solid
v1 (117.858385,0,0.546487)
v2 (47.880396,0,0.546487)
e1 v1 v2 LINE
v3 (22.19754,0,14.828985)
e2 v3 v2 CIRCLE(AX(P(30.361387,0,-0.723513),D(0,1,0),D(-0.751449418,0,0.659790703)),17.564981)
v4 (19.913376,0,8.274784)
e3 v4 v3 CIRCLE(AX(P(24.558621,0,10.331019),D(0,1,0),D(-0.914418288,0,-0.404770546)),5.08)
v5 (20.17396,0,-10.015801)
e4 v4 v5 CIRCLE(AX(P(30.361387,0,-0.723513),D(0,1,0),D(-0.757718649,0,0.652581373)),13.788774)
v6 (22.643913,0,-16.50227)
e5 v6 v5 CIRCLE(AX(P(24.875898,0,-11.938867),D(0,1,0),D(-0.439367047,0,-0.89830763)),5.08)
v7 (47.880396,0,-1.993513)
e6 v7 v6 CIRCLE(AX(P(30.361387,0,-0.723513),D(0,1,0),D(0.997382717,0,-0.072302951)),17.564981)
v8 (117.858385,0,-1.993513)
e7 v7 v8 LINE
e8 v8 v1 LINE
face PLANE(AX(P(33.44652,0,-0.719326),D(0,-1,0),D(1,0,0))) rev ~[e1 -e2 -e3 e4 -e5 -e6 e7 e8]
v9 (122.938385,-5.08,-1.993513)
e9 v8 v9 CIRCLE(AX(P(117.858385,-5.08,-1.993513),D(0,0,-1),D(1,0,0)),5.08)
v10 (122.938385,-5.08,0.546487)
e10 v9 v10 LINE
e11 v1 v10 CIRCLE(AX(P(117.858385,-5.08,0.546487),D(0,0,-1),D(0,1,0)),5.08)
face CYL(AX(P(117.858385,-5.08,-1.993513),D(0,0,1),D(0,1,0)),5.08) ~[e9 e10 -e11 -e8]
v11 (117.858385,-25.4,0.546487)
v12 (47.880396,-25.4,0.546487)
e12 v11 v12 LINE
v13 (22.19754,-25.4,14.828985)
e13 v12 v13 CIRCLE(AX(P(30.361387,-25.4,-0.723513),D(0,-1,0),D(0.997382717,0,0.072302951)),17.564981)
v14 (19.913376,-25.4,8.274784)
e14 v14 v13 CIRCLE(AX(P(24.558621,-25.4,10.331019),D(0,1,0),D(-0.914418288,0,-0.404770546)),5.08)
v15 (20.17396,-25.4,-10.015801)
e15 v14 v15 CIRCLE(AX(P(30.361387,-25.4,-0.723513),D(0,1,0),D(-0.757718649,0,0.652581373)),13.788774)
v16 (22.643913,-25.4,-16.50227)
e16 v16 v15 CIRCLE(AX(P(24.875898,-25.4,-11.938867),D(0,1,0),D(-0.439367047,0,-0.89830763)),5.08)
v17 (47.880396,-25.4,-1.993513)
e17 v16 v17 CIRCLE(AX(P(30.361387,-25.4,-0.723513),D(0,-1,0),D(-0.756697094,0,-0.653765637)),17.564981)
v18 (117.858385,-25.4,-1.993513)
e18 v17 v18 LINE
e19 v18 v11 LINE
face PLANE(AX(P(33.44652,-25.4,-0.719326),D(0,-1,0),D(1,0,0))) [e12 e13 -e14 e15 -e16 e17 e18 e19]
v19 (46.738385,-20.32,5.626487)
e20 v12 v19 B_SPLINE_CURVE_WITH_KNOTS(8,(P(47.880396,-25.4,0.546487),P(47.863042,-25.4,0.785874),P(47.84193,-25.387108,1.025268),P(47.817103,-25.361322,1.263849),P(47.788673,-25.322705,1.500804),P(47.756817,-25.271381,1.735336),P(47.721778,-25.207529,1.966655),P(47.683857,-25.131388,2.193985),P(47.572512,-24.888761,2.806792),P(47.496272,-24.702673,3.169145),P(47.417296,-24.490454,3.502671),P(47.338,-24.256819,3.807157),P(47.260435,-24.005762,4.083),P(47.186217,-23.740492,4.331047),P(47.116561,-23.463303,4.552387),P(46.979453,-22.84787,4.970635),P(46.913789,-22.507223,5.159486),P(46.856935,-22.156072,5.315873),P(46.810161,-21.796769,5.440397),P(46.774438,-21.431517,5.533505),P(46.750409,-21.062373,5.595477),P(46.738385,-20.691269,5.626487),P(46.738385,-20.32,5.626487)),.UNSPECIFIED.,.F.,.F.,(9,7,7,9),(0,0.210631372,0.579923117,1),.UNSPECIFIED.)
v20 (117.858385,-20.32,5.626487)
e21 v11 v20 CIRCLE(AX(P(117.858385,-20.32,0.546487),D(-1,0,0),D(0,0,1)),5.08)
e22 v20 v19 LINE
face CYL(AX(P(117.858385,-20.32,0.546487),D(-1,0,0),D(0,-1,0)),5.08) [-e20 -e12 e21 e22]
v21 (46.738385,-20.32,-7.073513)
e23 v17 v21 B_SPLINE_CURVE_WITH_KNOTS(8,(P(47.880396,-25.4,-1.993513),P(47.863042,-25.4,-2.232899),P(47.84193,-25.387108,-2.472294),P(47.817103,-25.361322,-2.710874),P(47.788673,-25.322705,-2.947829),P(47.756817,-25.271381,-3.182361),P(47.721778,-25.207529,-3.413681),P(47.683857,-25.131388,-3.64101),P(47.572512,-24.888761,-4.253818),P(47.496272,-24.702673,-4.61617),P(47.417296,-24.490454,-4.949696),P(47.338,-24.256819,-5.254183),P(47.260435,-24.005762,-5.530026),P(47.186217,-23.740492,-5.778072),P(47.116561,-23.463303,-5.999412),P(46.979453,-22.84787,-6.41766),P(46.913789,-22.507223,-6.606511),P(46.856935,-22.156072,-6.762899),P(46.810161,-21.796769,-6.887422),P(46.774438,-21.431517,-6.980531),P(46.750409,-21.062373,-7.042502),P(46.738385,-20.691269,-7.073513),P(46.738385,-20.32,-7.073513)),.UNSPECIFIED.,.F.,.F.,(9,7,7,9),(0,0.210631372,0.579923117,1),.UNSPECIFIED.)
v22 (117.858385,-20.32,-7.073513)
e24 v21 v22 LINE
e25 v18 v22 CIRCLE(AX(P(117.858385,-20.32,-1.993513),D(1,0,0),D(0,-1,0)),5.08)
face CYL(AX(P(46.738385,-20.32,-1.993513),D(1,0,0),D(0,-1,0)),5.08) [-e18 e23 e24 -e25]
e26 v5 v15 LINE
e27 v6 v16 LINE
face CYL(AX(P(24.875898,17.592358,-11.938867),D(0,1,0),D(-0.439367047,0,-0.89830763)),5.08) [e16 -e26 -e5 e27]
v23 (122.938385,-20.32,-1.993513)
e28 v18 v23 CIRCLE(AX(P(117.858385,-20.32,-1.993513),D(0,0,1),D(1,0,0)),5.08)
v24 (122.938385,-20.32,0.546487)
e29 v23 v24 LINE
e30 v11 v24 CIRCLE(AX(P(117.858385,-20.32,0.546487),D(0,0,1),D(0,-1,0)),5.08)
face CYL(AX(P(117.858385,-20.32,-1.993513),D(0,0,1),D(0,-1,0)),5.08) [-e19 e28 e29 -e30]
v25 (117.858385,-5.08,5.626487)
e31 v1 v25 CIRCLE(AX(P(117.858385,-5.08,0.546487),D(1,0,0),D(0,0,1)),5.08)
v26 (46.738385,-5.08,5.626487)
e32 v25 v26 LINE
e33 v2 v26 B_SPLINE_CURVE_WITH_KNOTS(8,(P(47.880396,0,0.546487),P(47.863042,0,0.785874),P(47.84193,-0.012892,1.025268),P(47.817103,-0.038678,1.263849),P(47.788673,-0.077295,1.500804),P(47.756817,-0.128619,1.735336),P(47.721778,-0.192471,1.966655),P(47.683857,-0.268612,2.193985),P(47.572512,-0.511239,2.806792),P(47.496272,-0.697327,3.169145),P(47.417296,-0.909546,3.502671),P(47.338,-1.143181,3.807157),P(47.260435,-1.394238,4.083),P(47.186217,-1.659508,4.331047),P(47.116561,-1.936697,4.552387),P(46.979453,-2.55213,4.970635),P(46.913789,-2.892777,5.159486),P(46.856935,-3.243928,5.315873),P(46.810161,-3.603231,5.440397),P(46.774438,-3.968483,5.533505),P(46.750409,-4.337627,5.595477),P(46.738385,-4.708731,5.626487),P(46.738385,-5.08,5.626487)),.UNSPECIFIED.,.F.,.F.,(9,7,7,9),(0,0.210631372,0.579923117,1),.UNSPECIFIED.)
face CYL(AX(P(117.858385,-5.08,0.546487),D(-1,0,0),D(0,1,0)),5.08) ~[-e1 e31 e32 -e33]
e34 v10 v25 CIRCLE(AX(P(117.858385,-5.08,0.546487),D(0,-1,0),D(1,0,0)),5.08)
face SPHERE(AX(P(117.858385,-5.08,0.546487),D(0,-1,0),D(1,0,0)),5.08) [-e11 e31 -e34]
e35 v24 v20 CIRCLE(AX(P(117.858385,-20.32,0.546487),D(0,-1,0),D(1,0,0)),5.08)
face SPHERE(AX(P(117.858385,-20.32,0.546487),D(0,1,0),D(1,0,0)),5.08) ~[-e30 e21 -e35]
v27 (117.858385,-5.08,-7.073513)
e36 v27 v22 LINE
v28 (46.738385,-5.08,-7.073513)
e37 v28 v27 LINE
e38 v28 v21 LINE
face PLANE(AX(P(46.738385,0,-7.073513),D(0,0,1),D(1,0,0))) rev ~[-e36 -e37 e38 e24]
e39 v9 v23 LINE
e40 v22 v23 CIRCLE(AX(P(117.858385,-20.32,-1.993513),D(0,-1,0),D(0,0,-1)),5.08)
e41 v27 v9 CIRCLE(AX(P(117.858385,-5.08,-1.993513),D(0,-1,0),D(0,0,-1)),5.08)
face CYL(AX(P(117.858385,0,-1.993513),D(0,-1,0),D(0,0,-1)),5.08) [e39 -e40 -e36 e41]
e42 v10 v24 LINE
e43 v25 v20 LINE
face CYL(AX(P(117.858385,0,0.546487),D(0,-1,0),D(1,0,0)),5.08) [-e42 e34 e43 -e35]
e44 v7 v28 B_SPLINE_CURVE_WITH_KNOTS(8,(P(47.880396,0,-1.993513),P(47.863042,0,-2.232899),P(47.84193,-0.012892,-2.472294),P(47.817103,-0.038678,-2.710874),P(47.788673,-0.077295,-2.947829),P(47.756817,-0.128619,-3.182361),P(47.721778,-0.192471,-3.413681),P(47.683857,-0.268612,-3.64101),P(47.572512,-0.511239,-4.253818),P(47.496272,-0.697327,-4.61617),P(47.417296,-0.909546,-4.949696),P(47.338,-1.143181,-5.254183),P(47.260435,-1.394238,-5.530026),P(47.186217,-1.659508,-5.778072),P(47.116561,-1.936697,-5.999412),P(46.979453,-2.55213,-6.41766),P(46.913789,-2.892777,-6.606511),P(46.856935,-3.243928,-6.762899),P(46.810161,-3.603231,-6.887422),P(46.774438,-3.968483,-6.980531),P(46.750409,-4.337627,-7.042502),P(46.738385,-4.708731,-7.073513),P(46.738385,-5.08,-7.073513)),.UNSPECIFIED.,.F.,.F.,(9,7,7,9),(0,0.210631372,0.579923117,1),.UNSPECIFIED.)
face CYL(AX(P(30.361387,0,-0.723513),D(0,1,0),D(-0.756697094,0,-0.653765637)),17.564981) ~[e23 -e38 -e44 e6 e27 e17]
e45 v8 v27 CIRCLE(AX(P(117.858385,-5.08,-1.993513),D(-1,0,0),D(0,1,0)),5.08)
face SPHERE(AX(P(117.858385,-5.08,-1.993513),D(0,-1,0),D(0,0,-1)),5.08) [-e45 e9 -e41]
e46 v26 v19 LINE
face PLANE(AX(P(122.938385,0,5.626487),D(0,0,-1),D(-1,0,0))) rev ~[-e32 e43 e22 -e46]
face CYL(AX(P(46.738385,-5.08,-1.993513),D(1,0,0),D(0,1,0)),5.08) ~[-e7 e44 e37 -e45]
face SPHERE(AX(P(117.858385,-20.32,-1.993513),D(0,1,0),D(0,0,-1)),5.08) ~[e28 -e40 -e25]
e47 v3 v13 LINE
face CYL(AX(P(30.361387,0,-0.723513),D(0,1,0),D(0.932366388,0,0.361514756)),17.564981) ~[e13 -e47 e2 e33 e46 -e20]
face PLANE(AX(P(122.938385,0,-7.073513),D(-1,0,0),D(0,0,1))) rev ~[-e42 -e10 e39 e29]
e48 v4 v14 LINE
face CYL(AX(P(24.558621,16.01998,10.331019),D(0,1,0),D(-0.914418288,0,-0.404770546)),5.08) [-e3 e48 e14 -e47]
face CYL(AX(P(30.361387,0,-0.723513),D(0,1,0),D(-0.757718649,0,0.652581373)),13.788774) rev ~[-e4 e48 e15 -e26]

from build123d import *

# Parameters (mm, degrees)
F1_DEPTH    = 25.4
F2_F1_R     = 5.08
F2_F2_R     = 5.08
F2_F3_R     = 5.08
F2_F4_R     = 5.08
F5_T1_DEPTH = 57.4399599705
F5_T3_DEPTH = 60.5847169717


# Not quite as in the source:
# - a fillet or chamfer that OpenCascade refuses, or shapes differently, is made with other operations: its cross-section is extruded or revolved along the edge and cut away or added
# - a feature of the source that left no trace in its solid (it failed there, or was rolled back) is left out


with BuildPart() as f1:
    # F0 (on Front) → F1 (new body)
    with BuildSketch(Plane.XZ):
        with BuildLine():
            ThreePointArc((19.913375901, 8.2747844221), (44.1487619553, -0.5270852778), (20.1739600729, -10.0158007924))
            Line((20.1739600729, -10.0158007924), (17.0700166839, -12.2068939621))
            ThreePointArc((17.0700166839, -12.2068939621), (33.3560783856, -18.0313258742), (46.7383854464, -7.0735126536))
            Line((46.7383854464, -7.0735126536), (46.7383854464, 5.6264873464))
            ThreePointArc((46.7383854464, 5.6264873464), (33.4251988827, 16.5721987148), (17.1621920022, 10.8656988202))
            Line((17.1621920022, 10.8656988202), (19.913375901, 8.2747844221))
        make_face()
        with BuildLine():
            Line((46.7383854464, 5.6264873464), (46.7383854464, -7.0735126536))
            ThreePointArc((46.7383854464, -7.0735126536), (47.9263685939, -0.7235126536), (46.7383854464, 5.6264873464))
        make_face()
        with BuildLine():
            ThreePointArc((46.7383854464, 5.6264873464), (47.9263685939, -0.7235126536), (46.7383854464, -7.0735126536))
            Line((46.7383854464, -7.0735126536), (122.9383854464, -7.0735126536))
            Line((122.9383854464, -7.0735126536), (122.9383854464, 5.6264873464))
            Line((122.9383854464, 5.6264873464), (46.7383854464, 5.6264873464))
        make_face()
    extrude(amount=F1_DEPTH)

    # F2: fillet of radius 5.08 on 4 edges, made by hand

    # F2_f1
    f2_f1_edges = [f1.edges().sort_by_distance(p)[0] for p in [
        (122.9383854464, -12.7, -7.0735126536),
    ]]
    fillet(f2_f1_edges, radius=F2_F1_R)

    # F2_f2
    f2_f2_edges = [f1.edges().sort_by_distance(p)[0] for p in [
        (122.9383854464, -12.7, 5.6264873464),
    ]]
    fillet(f2_f2_edges, radius=F2_F2_R)

    # F2_f3
    f2_f3_edges = [f1.edges().sort_by_distance(p)[0] for p in [
        (122.9383854464, 0, -0.7235126536),
    ]]
    fillet(f2_f3_edges, radius=F2_F3_R)

    # F2_f4
    f2_f4_edges = [f1.edges().sort_by_distance(p)[0] for p in [
        (122.9383854464, -25.4, -0.7235126536),
    ]]
    fillet(f2_f4_edges, radius=F2_F4_R)

    # F5: fillet of radius 5.08 on 2 edges, made by hand

    # F5_s2 → F5_t1 (cut)
    with BuildSketch(Plane.XZ.offset(-16.0199799852)):
        with BuildLine():
            ThreePointArc((19.913375901, 8.2747844221), (19.7615867452, 12.0028035456), (22.1975397768, 14.8289846016))
            ThreePointArc((22.1975397768, 14.8289846016), (19.4976030488, 13.0789063368), (17.1621920022, 10.8656988202))
            Line((17.1621920022, 10.8656988202), (19.913375901, 8.2747844221))
        make_face()
    extrude(amount=F5_T1_DEPTH, mode=Mode.SUBTRACT)

    # F5_s4 → F5_t3 (cut)
    with BuildSketch(Plane.XZ.offset(-17.5923584858)):
        with BuildLine():
            ThreePointArc((22.6439130786, -16.5022695354), (20.1284364115, -13.7466310122), (20.1739600729, -10.0158007924))
            Line((20.1739600729, -10.0158007924), (17.0700166839, -12.2068939621))
            ThreePointArc((17.0700166839, -12.2068939621), (19.6396592089, -14.6365685699), (22.6439130786, -16.5022695354))
        make_face()
    extrude(amount=F5_T3_DEPTH, mode=Mode.SUBTRACT)


solid = f1.part
